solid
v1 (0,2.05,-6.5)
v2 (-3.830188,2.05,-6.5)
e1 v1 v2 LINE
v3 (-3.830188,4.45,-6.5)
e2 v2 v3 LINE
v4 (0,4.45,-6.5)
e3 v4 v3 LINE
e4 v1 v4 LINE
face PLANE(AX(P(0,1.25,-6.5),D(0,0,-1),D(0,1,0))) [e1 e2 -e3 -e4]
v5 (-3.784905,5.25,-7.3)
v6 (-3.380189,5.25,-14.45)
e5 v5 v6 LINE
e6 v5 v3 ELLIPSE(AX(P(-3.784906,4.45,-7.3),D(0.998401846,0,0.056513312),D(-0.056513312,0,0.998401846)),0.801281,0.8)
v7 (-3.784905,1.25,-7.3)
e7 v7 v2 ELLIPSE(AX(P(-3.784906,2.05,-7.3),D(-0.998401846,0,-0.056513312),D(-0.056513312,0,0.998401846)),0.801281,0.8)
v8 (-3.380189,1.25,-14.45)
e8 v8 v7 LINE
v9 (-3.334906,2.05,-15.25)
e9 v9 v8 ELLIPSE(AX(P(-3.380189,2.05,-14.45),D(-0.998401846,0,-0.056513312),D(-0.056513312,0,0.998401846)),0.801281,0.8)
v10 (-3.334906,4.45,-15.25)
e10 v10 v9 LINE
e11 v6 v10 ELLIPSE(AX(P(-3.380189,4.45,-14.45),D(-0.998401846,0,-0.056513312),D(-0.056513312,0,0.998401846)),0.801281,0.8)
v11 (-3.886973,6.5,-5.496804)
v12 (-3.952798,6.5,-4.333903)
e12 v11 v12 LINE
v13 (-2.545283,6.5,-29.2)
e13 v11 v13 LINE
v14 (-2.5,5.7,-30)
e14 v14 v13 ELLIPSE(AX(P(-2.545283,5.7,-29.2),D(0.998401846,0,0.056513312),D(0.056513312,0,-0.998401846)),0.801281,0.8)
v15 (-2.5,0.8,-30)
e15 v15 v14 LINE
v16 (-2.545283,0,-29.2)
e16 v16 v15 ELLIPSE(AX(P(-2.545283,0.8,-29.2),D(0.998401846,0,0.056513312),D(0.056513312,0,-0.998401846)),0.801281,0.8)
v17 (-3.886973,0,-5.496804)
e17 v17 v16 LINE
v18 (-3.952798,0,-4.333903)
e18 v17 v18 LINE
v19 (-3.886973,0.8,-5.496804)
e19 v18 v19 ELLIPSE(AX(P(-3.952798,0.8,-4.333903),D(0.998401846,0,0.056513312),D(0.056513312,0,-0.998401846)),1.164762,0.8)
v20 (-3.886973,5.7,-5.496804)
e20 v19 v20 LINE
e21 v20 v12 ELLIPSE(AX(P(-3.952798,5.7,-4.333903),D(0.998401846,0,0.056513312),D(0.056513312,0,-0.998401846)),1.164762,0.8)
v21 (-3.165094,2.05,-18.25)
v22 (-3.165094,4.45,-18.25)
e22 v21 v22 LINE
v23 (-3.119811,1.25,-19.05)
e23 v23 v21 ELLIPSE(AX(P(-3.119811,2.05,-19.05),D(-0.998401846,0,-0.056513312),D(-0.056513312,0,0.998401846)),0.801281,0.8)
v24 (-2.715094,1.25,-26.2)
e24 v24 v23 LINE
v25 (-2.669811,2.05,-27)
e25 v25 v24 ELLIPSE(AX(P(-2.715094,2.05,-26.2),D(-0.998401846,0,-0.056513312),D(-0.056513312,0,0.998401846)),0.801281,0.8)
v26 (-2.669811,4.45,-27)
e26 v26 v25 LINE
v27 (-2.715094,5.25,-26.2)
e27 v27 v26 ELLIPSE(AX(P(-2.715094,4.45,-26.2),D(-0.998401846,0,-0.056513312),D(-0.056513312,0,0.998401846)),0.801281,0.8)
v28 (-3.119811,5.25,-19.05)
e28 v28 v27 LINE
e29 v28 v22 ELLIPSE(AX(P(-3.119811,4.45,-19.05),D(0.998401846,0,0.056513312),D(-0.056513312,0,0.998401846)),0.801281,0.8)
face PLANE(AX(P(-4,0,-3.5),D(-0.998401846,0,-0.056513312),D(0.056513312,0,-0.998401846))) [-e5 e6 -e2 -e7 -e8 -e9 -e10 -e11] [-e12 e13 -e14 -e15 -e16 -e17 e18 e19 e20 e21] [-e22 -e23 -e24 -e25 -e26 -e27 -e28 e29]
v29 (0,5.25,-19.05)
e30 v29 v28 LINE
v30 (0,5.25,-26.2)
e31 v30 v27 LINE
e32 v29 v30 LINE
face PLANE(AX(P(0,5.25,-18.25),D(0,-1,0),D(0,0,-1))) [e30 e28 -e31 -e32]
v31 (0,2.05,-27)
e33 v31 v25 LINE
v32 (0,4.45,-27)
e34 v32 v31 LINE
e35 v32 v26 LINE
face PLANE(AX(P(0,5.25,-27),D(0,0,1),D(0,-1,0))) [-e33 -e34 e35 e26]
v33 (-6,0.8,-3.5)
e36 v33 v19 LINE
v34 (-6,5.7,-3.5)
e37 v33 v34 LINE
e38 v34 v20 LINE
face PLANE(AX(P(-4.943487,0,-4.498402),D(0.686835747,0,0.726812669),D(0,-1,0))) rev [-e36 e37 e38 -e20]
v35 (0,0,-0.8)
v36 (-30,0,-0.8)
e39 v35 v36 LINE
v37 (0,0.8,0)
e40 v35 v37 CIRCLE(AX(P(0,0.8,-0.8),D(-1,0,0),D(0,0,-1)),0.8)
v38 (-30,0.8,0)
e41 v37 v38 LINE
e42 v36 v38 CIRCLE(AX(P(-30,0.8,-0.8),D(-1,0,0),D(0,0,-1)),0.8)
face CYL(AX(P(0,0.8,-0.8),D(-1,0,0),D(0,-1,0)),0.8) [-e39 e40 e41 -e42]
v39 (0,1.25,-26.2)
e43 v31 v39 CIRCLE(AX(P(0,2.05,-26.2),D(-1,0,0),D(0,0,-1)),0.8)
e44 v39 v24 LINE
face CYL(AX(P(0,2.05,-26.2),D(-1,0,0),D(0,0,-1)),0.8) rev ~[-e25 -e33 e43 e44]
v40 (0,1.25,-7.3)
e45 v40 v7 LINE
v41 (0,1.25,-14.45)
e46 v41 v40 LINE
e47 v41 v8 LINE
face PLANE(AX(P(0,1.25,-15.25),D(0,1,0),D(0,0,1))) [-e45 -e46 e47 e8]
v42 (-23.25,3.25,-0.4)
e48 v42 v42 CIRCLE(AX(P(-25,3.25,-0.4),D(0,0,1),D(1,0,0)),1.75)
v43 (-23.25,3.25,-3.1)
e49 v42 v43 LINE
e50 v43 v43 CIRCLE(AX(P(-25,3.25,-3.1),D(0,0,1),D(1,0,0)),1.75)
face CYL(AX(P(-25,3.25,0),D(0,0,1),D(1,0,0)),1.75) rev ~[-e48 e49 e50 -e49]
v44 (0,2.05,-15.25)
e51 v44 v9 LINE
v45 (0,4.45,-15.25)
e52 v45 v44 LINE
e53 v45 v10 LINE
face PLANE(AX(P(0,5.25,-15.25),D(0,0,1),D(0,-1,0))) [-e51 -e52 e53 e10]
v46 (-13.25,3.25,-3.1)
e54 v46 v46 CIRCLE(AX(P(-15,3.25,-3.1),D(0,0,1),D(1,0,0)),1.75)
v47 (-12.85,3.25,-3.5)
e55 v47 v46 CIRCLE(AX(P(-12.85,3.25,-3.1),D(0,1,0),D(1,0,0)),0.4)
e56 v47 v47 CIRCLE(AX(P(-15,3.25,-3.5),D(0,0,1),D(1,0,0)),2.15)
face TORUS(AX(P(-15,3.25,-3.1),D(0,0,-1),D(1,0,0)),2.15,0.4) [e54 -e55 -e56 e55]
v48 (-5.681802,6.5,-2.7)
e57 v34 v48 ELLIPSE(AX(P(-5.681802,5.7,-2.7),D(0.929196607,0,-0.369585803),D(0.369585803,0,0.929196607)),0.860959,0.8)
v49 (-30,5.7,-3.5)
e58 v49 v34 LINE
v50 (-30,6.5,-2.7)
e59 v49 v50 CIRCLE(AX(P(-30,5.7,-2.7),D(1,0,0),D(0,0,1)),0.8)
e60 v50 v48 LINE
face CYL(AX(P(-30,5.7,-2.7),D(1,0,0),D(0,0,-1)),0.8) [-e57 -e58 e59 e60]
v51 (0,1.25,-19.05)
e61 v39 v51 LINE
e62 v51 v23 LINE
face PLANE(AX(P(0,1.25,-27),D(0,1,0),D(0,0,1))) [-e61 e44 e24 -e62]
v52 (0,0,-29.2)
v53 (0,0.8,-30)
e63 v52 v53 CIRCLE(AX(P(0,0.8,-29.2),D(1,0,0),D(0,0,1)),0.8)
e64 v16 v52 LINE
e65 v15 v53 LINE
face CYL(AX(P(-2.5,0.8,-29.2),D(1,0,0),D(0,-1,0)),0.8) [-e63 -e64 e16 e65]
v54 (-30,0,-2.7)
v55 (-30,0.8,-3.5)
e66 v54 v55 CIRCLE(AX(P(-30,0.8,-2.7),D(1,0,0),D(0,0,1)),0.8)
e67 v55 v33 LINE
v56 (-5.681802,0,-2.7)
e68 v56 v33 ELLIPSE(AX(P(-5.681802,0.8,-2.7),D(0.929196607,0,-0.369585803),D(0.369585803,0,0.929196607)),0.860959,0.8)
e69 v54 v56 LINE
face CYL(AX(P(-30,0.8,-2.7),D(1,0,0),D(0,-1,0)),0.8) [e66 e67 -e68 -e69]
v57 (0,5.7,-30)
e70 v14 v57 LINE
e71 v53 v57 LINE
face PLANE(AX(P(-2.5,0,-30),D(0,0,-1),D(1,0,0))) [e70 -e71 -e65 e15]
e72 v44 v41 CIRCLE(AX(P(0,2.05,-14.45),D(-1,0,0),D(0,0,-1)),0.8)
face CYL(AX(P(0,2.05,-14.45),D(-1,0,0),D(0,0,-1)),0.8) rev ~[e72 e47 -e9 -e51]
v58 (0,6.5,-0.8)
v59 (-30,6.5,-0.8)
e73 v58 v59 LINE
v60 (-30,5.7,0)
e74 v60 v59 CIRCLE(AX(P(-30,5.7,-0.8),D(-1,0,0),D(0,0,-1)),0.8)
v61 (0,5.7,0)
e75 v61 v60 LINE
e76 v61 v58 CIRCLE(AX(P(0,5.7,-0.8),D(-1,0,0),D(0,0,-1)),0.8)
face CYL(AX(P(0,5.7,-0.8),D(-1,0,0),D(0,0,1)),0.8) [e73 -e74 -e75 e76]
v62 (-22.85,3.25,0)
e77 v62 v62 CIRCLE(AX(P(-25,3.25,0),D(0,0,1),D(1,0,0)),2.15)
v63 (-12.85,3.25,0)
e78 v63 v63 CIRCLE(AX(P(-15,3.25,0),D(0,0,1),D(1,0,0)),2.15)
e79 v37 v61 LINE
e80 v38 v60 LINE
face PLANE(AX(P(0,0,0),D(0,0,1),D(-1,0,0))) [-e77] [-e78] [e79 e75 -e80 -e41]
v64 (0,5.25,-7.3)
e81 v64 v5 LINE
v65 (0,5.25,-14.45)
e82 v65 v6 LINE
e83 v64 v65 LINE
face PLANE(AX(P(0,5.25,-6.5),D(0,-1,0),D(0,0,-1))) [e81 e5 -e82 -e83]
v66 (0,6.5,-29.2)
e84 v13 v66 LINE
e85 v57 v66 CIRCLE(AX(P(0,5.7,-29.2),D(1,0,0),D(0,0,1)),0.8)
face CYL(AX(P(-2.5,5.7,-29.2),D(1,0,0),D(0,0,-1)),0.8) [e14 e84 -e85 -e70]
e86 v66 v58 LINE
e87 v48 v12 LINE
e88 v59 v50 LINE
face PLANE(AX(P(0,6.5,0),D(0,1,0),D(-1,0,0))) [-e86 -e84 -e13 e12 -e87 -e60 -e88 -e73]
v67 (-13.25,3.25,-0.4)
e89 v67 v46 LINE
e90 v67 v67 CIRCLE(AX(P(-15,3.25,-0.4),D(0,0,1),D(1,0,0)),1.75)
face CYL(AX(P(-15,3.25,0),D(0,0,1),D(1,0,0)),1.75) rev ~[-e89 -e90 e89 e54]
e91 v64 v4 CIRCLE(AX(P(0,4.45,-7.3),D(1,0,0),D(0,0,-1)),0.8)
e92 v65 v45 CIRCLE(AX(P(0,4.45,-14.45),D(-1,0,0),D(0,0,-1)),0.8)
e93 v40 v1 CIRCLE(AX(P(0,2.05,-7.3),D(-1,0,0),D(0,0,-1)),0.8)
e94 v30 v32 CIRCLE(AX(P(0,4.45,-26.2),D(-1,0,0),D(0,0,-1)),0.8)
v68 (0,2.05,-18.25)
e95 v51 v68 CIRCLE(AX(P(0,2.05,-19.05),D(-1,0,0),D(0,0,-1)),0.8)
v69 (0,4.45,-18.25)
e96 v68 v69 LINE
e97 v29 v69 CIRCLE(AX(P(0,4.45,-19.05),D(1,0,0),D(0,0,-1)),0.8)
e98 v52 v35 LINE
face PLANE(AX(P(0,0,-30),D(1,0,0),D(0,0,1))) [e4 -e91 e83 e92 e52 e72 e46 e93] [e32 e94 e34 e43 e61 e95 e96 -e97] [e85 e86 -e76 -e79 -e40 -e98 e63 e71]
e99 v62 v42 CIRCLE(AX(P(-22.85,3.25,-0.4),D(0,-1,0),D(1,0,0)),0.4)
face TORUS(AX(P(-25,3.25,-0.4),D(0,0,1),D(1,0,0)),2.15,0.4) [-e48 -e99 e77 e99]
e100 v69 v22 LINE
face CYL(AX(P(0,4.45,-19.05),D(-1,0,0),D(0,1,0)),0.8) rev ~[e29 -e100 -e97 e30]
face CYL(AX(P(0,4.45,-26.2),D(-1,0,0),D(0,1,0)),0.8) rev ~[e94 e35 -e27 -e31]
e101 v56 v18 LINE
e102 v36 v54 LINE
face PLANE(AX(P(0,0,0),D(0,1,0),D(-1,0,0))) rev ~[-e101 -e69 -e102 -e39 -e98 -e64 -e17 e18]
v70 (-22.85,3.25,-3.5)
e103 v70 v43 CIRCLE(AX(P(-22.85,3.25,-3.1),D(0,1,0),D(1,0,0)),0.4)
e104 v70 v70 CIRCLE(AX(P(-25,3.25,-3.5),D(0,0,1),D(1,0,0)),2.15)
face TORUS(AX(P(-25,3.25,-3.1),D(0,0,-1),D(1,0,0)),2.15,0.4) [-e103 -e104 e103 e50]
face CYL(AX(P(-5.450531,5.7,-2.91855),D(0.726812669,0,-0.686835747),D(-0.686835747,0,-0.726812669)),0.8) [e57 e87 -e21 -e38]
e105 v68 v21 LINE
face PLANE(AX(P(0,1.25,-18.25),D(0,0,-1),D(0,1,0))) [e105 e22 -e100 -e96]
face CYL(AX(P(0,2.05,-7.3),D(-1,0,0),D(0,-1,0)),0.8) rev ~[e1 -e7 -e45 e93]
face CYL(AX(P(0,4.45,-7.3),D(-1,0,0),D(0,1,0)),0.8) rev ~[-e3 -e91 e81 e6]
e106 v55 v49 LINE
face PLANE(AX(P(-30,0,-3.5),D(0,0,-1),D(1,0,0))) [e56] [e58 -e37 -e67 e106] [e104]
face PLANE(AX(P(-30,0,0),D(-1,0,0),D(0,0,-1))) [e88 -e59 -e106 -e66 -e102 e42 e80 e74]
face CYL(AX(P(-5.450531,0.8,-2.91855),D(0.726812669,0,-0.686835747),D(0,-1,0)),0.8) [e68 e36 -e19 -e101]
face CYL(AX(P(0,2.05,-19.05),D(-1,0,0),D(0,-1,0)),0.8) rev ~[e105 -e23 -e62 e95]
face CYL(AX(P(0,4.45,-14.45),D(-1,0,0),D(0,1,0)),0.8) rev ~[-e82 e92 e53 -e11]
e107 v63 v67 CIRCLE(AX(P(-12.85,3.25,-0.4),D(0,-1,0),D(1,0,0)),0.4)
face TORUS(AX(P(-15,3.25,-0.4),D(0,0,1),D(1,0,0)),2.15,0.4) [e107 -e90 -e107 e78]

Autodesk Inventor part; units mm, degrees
ref_plane "YZ Plane" through (0, 0, 0) normal (1, 0, 0) x (0, 1, 0)
ref_plane "XZ Plane" through (0, 0, 0) normal (0, 1, 0) x (-1, 0, 0)
ref_plane "XY Plane" through (0, 0, 0) normal (0, 0, 1) x (1, 0, 0)
sketch "Szkic1" plane through (0, 0, 0) normal (0, 1, 0) x (-1, 0, 0)
  line L0 (0, 0) -> (30, 0)
  line L1 (30, 0) -> (30, -3.5)
  line L2 (30, -3.5) -> (4, -3.5)
  line L3 (4, -3.5) -> (2.5, -30)
  line L4 (2.5, -30) -> (0, -30)
  line L5 (0, -30) -> (0, 0)
  dimension "d0" = 30
  dimension "d1" = 30
  dimension "d2" = 3.5
  dimension "d3" = 2.5
  dimension "d4" = 4
extrude "Wyciągnięcie proste1" add sketch "Szkic1" along normal blind 6.5
sketch "Szkic2" plane through (0, 0, 0) normal (1, 0, 0) x (0, 0, -1)
  line L0 (0, 0) -> (30, 0) projected
  line L1 (30, 0) -> (30, 6.5) projected
  line L2 (0, 6.5) -> (30, 6.5) projected
  line L3 (0, 0) -> (0, 6.5) projected
  line L4 (30, 3.25) -> (0, 3.25) construction
  line L5 (18.25, 5.25) -> (27, 5.25)
  line L6 (27, 5.25) -> (27, 1.25)
  line L7 (27, 1.25) -> (18.25, 1.25)
  line L8 (18.25, 1.25) -> (18.25, 5.25)
  line L9 (18.25, 5.25) -> (27, 1.25) construction
  line L10 (27, 5.25) -> (18.25, 1.25) construction
  line L11 (6.5, 5.25) -> (15.25, 5.25)
  line L12 (15.25, 5.25) -> (15.25, 1.25)
  line L13 (15.25, 1.25) -> (6.5, 1.25)
  line L14 (6.5, 1.25) -> (6.5, 5.25)
  line L15 (6.5, 5.25) -> (15.25, 1.25) construction
  line L16 (15.25, 5.25) -> (6.5, 1.25) construction
  line L17 (3.5, 0) -> (3.5, 6.5) projected
  point P0 (22.625, 3.25)
  point P1 (10.875, 3.25)
  dimension "d7" = 26.5
  dimension "d8" = 3
  dimension "d9" = 3
  dimension "d10" = 3
  dimension "d11" = 4
extrude "Wyciągnięcie proste2" cut sketch "Szkic2" against normal up to surface contours L5 L6 L7 L8 | L11 L12 L13 L14 surface through (-2.5, 0, -30) normal (-0.9984018, 0, -0.0565133)
sketch "Szkic3" plane through (-30, 0, 0) normal (0, 0, 1) x (1, 0, 0)
  line L0 (0, 0) -> (30, 0) projected
  line L1 (30, 0) -> (30, 6.5) projected
  line L2 (0, 6.5) -> (30, 6.5) construction
  line L3 (0, 0) -> (0, 6.5) projected
  line L4 (0, 3.25) -> (30, 3.25) construction
  circle A0 centre (15, 3.25) radius 1.75
  circle A1 centre (5, 3.25) radius 1.75
  dimension "d14" = 3.5
  dimension "d15" = 15
  dimension "d16" = 10
extrude "Wyciągnięcie proste3" cut sketch "Szkic3" against normal up to surface (3.5 mm away)
chamfer "Faza1" distance 2 angle 45 1 edges at (-4, 3.25, -3.5)
fillet "Zaokrąglenie1" radius 0.8 16 edges at (-1.25, 6.5, -30) (-1.25, 0, -30) (-15, 6.5, 0) (-15, 0, 0) (-18, 0, -3.5) (-18, 6.5, -3.5) (-4.9435, 6.5, -4.4984) (-4.9435, 0, -4.4984) (-1.9151, 1.25, -6.5) (-1.9151, 5.25, -6.5) (-1.6675, 5.25, -15.25) (-1.6675, 1.25, -15.25) (-1.5825, 1.25, -18.25) (-1.5825, 5.25, -18.25) (-1.3349, 5.25, -27) (-1.3349, 1.25, -27)
fillet "Zaokrąglenie2" radius 0.4 4 edges at (-16.75, 3.25, -3.5) (-16.75, 3.25, 0) (-26.75, 3.25, 0) (-26.75, 3.25, -3.5)
equation "\"d9\" = d8"
properties part number "noga2"
